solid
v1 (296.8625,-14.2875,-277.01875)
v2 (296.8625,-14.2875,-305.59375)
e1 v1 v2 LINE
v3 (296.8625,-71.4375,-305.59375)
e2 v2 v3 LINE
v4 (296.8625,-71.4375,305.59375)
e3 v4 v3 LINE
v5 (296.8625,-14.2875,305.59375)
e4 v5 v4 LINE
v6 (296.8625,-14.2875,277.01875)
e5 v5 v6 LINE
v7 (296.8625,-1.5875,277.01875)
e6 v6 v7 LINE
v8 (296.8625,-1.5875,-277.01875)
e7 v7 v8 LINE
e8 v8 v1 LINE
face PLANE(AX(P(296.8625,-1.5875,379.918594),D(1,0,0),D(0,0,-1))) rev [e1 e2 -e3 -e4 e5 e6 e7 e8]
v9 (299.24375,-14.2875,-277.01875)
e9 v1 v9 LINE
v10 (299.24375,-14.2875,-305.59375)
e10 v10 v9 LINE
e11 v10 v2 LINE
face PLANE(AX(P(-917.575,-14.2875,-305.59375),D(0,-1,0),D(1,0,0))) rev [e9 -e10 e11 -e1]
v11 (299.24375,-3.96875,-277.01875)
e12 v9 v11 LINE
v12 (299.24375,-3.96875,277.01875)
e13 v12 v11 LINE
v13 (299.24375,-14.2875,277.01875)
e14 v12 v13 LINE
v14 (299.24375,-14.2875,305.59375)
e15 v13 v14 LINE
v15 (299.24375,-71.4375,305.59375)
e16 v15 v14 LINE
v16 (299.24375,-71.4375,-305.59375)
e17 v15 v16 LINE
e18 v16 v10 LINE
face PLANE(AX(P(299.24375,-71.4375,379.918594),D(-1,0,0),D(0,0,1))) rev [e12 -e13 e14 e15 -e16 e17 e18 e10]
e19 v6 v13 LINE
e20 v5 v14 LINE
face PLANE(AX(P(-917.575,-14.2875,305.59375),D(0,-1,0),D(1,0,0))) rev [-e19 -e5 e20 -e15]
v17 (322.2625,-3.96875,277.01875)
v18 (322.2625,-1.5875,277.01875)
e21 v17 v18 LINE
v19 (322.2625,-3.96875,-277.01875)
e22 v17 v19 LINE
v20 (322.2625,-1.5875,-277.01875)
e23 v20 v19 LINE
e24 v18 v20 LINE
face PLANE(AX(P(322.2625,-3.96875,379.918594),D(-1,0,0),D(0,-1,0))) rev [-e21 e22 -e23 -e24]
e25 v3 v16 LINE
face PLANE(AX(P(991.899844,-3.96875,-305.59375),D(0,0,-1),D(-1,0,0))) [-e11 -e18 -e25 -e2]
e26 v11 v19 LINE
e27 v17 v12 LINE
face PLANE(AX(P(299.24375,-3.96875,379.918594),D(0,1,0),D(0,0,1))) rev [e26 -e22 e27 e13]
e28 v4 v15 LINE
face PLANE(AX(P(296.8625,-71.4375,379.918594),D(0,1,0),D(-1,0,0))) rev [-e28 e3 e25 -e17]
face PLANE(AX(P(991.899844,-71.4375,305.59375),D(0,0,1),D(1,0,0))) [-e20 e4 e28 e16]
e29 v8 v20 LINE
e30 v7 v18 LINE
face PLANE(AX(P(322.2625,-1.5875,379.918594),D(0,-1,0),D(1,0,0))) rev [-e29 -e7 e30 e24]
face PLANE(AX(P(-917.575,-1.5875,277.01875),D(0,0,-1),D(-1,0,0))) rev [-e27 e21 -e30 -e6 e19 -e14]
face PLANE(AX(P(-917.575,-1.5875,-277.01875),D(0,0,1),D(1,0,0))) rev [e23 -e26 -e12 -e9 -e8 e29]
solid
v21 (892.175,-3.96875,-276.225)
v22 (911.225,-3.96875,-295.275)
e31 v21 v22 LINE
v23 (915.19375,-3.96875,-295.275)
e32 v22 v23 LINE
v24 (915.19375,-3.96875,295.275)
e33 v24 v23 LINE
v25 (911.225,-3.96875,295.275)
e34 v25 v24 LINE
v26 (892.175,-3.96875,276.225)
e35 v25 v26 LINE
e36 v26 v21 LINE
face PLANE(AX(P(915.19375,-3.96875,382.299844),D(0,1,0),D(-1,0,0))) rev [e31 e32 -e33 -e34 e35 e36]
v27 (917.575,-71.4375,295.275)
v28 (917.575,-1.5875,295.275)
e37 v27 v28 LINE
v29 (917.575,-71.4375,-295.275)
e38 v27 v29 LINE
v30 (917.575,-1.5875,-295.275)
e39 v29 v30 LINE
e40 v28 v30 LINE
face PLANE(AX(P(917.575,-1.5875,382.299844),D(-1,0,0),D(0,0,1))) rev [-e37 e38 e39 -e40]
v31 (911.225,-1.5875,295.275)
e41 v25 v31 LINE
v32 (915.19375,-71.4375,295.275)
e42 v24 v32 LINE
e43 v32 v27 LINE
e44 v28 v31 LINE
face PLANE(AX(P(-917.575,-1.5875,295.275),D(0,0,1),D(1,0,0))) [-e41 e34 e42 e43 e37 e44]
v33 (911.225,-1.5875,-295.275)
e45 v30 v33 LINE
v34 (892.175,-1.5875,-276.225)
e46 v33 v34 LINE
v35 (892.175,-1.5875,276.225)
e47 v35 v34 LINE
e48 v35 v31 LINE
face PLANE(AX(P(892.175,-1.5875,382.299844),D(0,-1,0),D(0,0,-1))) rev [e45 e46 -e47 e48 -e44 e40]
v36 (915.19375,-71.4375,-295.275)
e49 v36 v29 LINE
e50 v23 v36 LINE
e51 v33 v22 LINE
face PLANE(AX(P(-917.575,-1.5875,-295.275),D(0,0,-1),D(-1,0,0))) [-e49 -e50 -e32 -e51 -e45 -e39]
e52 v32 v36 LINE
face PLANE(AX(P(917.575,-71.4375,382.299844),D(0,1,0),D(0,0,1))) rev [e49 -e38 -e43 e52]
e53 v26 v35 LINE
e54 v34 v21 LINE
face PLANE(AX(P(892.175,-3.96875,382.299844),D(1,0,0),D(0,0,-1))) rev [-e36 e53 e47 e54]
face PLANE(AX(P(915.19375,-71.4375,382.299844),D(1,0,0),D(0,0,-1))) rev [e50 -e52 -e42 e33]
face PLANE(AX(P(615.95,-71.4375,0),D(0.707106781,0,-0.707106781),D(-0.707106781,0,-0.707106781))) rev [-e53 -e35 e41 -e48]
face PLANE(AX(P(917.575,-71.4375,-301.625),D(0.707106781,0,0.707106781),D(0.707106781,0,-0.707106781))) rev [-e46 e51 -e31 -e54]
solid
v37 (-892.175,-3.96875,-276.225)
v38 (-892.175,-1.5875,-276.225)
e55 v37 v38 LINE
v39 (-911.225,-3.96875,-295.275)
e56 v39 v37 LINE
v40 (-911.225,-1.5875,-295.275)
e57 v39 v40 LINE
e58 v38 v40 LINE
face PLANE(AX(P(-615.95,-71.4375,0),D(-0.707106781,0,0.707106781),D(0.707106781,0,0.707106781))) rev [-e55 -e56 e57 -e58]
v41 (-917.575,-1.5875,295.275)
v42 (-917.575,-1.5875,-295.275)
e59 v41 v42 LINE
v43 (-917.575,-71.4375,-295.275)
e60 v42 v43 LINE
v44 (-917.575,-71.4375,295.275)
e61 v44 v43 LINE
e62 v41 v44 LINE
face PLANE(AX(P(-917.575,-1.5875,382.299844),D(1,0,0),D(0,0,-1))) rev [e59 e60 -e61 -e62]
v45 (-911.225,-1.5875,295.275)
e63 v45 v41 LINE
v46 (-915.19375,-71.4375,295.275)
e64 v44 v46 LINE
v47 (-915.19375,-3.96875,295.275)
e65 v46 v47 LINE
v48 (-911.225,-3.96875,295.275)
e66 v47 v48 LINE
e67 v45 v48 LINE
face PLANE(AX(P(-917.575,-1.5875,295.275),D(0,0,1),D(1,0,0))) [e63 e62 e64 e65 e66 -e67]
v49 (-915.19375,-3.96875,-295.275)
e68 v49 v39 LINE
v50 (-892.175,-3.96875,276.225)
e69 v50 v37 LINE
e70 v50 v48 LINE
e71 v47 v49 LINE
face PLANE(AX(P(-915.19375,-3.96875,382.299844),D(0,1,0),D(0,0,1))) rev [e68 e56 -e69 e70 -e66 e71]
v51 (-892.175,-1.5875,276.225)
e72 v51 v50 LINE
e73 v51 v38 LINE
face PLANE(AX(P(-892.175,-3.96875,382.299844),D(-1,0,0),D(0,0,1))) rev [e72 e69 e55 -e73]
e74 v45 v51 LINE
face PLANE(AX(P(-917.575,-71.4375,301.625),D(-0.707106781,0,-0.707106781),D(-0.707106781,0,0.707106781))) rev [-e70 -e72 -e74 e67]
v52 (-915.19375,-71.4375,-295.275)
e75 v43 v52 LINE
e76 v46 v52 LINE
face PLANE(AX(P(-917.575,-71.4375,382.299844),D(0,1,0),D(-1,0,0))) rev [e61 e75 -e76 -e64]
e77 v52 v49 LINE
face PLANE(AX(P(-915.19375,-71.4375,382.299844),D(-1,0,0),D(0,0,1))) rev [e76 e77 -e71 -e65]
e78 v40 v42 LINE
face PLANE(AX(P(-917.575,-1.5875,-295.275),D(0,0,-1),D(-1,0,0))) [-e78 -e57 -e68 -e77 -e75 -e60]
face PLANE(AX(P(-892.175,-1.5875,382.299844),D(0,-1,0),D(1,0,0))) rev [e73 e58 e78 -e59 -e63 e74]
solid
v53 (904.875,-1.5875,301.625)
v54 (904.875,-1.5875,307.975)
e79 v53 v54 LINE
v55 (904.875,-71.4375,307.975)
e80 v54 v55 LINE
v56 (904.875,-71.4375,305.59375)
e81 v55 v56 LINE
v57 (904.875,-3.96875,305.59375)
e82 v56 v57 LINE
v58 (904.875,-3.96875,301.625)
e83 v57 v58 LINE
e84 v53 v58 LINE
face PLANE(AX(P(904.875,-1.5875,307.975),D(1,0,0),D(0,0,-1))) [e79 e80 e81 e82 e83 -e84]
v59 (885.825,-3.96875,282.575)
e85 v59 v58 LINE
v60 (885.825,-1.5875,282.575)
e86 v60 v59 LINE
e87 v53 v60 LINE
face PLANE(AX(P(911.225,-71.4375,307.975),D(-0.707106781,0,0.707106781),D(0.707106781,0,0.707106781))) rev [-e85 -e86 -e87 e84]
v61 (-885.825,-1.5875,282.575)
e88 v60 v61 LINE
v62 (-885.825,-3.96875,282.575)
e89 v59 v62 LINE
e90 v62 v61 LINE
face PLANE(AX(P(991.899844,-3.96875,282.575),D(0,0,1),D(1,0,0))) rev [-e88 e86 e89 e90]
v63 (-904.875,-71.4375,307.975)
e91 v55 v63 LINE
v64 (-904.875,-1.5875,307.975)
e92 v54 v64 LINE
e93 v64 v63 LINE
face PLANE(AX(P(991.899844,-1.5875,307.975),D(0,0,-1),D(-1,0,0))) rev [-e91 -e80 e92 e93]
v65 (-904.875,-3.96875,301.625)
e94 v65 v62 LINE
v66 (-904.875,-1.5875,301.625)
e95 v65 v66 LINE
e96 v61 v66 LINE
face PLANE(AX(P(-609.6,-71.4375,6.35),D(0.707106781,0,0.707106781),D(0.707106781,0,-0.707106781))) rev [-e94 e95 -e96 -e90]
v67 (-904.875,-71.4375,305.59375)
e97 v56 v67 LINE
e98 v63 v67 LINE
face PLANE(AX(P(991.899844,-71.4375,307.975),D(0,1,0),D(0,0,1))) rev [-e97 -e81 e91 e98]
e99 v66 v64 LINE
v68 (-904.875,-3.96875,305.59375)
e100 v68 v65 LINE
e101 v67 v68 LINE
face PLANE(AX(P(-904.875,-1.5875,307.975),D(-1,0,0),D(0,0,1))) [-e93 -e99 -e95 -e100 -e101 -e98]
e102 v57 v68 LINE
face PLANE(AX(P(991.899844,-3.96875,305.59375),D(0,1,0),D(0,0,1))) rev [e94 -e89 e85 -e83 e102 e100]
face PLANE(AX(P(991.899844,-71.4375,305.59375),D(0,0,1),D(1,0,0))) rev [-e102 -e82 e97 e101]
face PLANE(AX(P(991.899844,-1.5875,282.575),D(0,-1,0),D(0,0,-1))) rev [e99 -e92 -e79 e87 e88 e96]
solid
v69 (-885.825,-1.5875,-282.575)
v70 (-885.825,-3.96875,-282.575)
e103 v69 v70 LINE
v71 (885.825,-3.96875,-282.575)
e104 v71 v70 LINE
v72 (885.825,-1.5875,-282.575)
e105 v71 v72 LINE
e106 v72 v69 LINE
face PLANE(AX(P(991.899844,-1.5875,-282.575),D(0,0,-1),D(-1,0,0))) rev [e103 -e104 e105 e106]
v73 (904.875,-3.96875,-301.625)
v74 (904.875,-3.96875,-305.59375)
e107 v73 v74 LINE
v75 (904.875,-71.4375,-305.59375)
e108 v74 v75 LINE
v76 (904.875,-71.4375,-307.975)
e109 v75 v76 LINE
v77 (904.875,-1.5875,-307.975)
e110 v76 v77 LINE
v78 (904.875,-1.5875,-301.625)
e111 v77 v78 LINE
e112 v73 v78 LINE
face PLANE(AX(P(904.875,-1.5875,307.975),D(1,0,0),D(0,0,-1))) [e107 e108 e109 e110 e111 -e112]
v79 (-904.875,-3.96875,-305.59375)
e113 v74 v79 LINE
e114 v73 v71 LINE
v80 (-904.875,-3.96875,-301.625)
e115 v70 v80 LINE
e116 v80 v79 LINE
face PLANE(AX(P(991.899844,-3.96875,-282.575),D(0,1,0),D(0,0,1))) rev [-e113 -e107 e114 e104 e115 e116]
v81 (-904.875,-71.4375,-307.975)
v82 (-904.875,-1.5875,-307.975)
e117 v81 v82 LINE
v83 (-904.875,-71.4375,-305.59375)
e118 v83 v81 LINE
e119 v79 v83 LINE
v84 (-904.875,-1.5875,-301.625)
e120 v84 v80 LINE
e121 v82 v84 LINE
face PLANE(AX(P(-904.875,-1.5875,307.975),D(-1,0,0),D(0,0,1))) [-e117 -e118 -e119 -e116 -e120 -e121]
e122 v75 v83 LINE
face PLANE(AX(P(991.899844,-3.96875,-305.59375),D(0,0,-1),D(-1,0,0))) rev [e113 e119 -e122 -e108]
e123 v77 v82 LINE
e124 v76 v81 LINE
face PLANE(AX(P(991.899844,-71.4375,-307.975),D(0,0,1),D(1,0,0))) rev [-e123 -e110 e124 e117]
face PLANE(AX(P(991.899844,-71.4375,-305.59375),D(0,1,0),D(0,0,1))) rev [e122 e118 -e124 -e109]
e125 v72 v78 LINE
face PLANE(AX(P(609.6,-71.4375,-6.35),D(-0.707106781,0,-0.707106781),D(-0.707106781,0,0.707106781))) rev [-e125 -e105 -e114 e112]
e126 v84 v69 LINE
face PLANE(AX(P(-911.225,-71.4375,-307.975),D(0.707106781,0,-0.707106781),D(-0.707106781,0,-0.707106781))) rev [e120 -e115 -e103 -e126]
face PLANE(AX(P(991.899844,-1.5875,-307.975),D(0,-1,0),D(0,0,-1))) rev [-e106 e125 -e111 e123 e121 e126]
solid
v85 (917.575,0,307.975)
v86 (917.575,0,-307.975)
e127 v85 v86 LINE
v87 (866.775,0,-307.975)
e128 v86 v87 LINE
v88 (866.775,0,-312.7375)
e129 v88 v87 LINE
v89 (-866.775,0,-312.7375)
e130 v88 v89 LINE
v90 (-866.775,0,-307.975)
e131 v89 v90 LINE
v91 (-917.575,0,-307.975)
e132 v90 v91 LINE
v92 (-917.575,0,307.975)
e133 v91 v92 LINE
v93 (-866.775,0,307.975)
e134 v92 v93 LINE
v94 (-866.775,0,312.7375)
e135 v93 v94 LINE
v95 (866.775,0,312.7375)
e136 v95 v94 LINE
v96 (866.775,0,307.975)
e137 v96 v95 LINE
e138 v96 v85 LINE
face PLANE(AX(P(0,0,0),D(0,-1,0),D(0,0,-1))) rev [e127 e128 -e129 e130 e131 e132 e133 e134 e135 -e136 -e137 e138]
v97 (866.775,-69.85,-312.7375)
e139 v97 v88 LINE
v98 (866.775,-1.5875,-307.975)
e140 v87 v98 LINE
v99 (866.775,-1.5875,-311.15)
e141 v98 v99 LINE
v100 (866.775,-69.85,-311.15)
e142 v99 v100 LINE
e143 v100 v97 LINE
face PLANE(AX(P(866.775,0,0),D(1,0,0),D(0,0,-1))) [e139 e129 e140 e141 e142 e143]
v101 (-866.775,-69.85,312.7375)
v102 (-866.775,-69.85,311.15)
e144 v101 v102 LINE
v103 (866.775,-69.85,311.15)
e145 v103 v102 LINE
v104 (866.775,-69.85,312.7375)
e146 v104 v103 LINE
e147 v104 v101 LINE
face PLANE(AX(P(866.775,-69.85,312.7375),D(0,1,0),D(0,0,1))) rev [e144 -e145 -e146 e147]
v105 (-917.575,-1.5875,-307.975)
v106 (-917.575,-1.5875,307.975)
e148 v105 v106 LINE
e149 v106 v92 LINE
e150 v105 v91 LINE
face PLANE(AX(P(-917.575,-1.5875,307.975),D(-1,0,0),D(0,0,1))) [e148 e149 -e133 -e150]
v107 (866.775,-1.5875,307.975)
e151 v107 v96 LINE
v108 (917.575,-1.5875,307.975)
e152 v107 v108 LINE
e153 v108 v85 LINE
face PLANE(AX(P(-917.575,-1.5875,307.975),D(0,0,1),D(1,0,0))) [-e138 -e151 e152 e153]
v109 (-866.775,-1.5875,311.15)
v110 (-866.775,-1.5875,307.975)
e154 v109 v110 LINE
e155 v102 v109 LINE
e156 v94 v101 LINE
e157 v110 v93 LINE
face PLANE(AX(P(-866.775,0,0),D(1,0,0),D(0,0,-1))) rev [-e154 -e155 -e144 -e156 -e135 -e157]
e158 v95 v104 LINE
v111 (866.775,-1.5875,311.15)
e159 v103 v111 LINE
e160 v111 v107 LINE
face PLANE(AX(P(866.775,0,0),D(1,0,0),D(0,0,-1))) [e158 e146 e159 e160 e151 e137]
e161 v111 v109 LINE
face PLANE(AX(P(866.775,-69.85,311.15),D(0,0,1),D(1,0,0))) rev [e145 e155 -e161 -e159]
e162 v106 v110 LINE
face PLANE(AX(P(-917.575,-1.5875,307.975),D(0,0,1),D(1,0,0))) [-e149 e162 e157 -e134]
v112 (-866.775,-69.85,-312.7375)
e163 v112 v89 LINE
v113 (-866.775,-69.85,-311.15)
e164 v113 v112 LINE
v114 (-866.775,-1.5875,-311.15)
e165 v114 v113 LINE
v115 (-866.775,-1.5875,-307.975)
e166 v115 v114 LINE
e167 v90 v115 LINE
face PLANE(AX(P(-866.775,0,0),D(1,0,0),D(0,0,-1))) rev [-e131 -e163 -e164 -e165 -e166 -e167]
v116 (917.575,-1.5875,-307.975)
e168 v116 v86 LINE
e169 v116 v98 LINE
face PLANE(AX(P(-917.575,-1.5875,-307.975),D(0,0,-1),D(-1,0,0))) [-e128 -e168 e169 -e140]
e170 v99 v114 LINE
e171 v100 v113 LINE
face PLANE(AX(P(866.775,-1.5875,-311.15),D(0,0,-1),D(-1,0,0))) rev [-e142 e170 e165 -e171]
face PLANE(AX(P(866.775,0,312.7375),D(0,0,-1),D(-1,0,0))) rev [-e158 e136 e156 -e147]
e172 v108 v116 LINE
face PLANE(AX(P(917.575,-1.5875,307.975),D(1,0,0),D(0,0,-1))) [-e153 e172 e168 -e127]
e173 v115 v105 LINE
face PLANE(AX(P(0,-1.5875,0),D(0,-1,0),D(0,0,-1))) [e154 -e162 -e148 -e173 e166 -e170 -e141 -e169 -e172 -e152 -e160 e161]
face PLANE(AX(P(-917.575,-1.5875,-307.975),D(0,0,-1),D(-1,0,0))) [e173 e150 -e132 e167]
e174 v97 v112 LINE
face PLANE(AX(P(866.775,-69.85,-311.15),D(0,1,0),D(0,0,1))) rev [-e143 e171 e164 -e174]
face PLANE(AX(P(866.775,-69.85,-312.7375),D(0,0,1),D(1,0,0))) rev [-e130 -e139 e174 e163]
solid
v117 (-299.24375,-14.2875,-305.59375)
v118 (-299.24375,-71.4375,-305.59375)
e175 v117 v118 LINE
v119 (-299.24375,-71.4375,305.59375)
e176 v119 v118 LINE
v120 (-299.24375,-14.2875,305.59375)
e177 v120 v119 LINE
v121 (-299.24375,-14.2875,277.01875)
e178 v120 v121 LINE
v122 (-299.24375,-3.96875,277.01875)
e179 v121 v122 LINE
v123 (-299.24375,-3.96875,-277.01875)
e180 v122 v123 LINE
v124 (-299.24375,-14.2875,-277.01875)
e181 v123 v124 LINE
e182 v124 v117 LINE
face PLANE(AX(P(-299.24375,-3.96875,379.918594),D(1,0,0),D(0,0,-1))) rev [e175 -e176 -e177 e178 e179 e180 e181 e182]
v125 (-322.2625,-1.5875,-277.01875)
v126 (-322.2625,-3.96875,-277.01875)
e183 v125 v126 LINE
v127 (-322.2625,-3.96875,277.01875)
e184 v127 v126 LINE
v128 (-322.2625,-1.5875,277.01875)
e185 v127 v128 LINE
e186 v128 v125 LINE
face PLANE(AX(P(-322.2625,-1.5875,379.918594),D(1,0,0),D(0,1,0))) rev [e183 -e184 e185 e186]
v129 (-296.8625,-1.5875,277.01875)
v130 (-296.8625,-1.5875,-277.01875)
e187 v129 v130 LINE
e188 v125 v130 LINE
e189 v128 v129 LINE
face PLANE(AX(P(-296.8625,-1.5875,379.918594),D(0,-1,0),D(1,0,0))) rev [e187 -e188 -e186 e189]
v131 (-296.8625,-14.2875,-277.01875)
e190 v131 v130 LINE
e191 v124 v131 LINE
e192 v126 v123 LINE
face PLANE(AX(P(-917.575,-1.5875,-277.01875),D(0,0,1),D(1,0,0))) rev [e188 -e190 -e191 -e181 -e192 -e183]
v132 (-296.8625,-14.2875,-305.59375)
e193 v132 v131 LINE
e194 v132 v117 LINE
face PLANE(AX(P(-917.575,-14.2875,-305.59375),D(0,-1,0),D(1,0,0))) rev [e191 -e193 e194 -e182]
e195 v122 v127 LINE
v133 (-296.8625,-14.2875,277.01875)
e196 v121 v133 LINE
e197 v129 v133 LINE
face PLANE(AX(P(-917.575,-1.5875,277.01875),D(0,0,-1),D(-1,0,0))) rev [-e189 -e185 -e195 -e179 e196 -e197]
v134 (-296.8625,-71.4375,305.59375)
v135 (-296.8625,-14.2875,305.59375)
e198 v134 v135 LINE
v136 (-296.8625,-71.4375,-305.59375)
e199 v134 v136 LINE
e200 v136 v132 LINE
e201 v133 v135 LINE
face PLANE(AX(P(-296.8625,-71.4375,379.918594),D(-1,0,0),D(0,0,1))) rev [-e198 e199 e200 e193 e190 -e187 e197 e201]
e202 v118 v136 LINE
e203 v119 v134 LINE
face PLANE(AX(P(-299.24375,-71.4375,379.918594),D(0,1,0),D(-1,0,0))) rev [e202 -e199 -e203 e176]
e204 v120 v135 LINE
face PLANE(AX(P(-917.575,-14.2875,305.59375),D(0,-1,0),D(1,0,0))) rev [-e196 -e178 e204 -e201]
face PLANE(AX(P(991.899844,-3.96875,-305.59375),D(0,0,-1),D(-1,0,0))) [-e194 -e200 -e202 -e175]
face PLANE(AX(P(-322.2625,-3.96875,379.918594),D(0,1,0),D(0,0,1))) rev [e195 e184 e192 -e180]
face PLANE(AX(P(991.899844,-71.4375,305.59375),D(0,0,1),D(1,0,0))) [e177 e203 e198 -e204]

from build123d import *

# Parameters (mm, degrees)
SKETCH1_W                  = 1835.15
SKETCH1_H                  = 615.95
BOSS_EXTRUDE1_DEPTH        = 1.5875
BOSS_EXTRUDE2_DEPTH        = 866.775
BOSS_EXTRUDE3_DEPTH        = 904.875
BOSS_EXTRUDE3_DEPTH_BACK   = 904.875
BOSS_EXTRUDE3_2_DEPTH      = 904.875
BOSS_EXTRUDE3_2_DEPTH_BACK = 904.875
BOSS_EXTRUDE4_DEPTH        = 295.275
BOSS_EXTRUDE4_DEPTH_BACK   = 295.275
BOSS_EXTRUDE4_2_DEPTH      = 295.275
BOSS_EXTRUDE4_2_DEPTH_BACK = 295.275
CUT_EXTRUDE1_START         = -3.96875
CUT_EXTRUDE1_DEPTH         = 2.38125
CUT_EXTRUDE1_2_DEPTH       = 2.38125
CUT_EXTRUDE1_3_DEPTH       = 2.38125
CUT_EXTRUDE1_4_DEPTH       = 2.38125
BOSS_EXTRUDE5_START        = -305.59375
BOSS_EXTRUDE5_DEPTH        = 611.1875
SKETCH9_W                  = 28.575
SKETCH9_H                  = 12.7
CUT_EXTRUDE2_DEPTH         = 1281.6658763


# Read off the part's stored shape, not the designer's step: Cut-Extrude1, Boss-Extrude5
with BuildPart() as part:
    # Sketch1 → Boss-Extrude1 (new body)
    with BuildSketch(Plane(origin=(0, 0, 0), x_dir=(1, 0, 0), z_dir=(0, 1, 0))):
        Rectangle(SKETCH1_W, SKETCH1_H)
    extrude(amount=-BOSS_EXTRUDE1_DEPTH)

    # Sketch2 → Boss-Extrude2 (add, symmetric)
    with BuildSketch(Plane(origin=(0, 0, 0), x_dir=(0, 0, -1), z_dir=(1, 0, 0))):
        Polygon((-311.15, -1.5875), (311.15, -1.5875), (311.15, -69.85), (312.7375, -69.85), (312.7375, 0), (-312.7375, 0), (-312.7375, -69.85), (-311.15, -69.85), align=None)
    extrude(amount=BOSS_EXTRUDE2_DEPTH, both=True)


with BuildPart() as body_2:
    # Sketch3 → Boss-Extrude3 (new, two sides: drawn at the far end of the back side and taken through both)
    with BuildSketch(Plane(origin=(0, 0, 0), x_dir=(0, 0, -1), z_dir=(1, 0, 0)).offset(-BOSS_EXTRUDE3_DEPTH_BACK)):
        Polygon((307.975, -71.4375), (307.975, -1.5875), (282.575, -1.5875), (282.575, -3.96875), (305.59375, -3.96875), (305.59375, -71.4375), align=None)
    extrude(amount=BOSS_EXTRUDE3_DEPTH + BOSS_EXTRUDE3_DEPTH_BACK)

    # Cut-Extrude1 4 outline → Cut-Extrude1 4 (cut)
    with BuildSketch(Plane(origin=(0, 0, 0), x_dir=(1, 0, 0), z_dir=(0, 1, 0)).offset(CUT_EXTRUDE1_START)):
        Polygon((-904.875, 282.575), (-885.825, 282.575), (-904.875, 301.625), align=None)
        Polygon((904.875, 301.625), (885.825, 282.575), (904.875, 282.575), align=None)
    extrude(amount=CUT_EXTRUDE1_4_DEPTH, mode=Mode.SUBTRACT)


with BuildPart() as body_3:
    # Sketch3 → Boss-Extrude3 2 (new, two sides: drawn at the far end of the back side and taken through both)
    with BuildSketch(Plane(origin=(0, 0, 0), x_dir=(0, 0, -1), z_dir=(1, 0, 0)).offset(-BOSS_EXTRUDE3_2_DEPTH_BACK)):
        Polygon((-282.575, -1.5875), (-307.975, -1.5875), (-307.975, -71.4375), (-305.59375, -71.4375), (-305.59375, -3.96875), (-282.575, -3.96875), align=None)
    extrude(amount=BOSS_EXTRUDE3_2_DEPTH + BOSS_EXTRUDE3_2_DEPTH_BACK)

    # Cut-Extrude1 3 outline → Cut-Extrude1 3 (cut)
    with BuildSketch(Plane(origin=(0, 0, 0), x_dir=(1, 0, 0), z_dir=(0, 1, 0)).offset(CUT_EXTRUDE1_START)):
        Polygon((-904.875, -282.575), (-904.875, -301.625), (-885.825, -282.575), align=None)
        Polygon((904.875, -282.575), (885.825, -282.575), (904.875, -301.625), align=None)
    extrude(amount=CUT_EXTRUDE1_3_DEPTH, mode=Mode.SUBTRACT)


with BuildPart() as body_4:
    # Sketch4 → Boss-Extrude4 (new, two sides: drawn at the far end of the back side and taken through both)
    with BuildSketch(Plane.XY.offset(-BOSS_EXTRUDE4_DEPTH_BACK)):
        Polygon((892.175, -1.5875), (917.575, -1.5875), (917.575, -71.4375), (915.19375, -71.4375), (915.19375, -3.96875), (892.175, -3.96875), align=None)
    extrude(amount=BOSS_EXTRUDE4_DEPTH + BOSS_EXTRUDE4_DEPTH_BACK)

    # Cut-Extrude1 2 outline → Cut-Extrude1 2 (cut)
    with BuildSketch(Plane(origin=(0, 0, 0), x_dir=(1, 0, 0), z_dir=(0, 1, 0)).offset(CUT_EXTRUDE1_START)):
        Polygon((892.175, 295.275), (892.175, 276.225), (911.225, 295.275), align=None)
        Polygon((911.225, -295.275), (892.175, -276.225), (892.175, -295.275), align=None)
    extrude(amount=CUT_EXTRUDE1_2_DEPTH, mode=Mode.SUBTRACT)


with BuildPart() as body_5:
    # Sketch4 → Boss-Extrude4 2 (new, two sides: drawn at the far end of the back side and taken through both)
    with BuildSketch(Plane.XY.offset(-BOSS_EXTRUDE4_2_DEPTH_BACK)):
        Polygon((-917.575, -1.5875), (-917.575, -71.4375), (-915.19375, -71.4375), (-915.19375, -3.96875), (-892.175, -3.96875), (-892.175, -1.5875), align=None)
    extrude(amount=BOSS_EXTRUDE4_2_DEPTH + BOSS_EXTRUDE4_2_DEPTH_BACK)

    # Cut-Extrude1 outline → Cut-Extrude1 (cut)
    with BuildSketch(Plane(origin=(0, 0, 0), x_dir=(1, 0, 0), z_dir=(0, 1, 0)).offset(CUT_EXTRUDE1_START)):
        Polygon((-892.175, 295.275), (-911.225, 295.275), (-892.175, 276.225), align=None)
        Polygon((-892.175, -295.275), (-892.175, -276.225), (-911.225, -295.275), align=None)
    extrude(amount=CUT_EXTRUDE1_DEPTH, mode=Mode.SUBTRACT)


with BuildPart() as body_6:
    # Boss-Extrude5 outline → Boss-Extrude5 (new body)
    with BuildSketch(Plane.XY.offset(BOSS_EXTRUDE5_START)):
        Polygon((-296.8625, -71.4375), (-296.8625, -1.5875), (-322.2625, -1.5875), (-322.2625, -3.96875), (-299.24375, -3.96875), (-299.24375, -71.4375), align=None)
        Polygon((322.2625, -1.5875), (296.8625, -1.5875), (296.8625, -71.4375), (299.24375, -71.4375), (299.24375, -3.96875), (322.2625, -3.96875), align=None)
    extrude(amount=BOSS_EXTRUDE5_DEPTH)

    # Sketch9 → Cut-Extrude2 (cut, through all)
    with BuildSketch(Plane(origin=(322.2625, 0, 0), x_dir=(0, 0, -1), z_dir=(1, 0, 0))):
        with Locations((-291.30625, -7.9375)):
            Rectangle(SKETCH9_W, SKETCH9_H)
        with Locations((291.30625, -7.9375)):
            Rectangle(SKETCH9_W, SKETCH9_H)
    extrude(amount=-CUT_EXTRUDE2_DEPTH, mode=Mode.SUBTRACT)


solid = Compound([part.part, body_2.part, body_3.part, body_4.part, body_5.part, body_6.part])
